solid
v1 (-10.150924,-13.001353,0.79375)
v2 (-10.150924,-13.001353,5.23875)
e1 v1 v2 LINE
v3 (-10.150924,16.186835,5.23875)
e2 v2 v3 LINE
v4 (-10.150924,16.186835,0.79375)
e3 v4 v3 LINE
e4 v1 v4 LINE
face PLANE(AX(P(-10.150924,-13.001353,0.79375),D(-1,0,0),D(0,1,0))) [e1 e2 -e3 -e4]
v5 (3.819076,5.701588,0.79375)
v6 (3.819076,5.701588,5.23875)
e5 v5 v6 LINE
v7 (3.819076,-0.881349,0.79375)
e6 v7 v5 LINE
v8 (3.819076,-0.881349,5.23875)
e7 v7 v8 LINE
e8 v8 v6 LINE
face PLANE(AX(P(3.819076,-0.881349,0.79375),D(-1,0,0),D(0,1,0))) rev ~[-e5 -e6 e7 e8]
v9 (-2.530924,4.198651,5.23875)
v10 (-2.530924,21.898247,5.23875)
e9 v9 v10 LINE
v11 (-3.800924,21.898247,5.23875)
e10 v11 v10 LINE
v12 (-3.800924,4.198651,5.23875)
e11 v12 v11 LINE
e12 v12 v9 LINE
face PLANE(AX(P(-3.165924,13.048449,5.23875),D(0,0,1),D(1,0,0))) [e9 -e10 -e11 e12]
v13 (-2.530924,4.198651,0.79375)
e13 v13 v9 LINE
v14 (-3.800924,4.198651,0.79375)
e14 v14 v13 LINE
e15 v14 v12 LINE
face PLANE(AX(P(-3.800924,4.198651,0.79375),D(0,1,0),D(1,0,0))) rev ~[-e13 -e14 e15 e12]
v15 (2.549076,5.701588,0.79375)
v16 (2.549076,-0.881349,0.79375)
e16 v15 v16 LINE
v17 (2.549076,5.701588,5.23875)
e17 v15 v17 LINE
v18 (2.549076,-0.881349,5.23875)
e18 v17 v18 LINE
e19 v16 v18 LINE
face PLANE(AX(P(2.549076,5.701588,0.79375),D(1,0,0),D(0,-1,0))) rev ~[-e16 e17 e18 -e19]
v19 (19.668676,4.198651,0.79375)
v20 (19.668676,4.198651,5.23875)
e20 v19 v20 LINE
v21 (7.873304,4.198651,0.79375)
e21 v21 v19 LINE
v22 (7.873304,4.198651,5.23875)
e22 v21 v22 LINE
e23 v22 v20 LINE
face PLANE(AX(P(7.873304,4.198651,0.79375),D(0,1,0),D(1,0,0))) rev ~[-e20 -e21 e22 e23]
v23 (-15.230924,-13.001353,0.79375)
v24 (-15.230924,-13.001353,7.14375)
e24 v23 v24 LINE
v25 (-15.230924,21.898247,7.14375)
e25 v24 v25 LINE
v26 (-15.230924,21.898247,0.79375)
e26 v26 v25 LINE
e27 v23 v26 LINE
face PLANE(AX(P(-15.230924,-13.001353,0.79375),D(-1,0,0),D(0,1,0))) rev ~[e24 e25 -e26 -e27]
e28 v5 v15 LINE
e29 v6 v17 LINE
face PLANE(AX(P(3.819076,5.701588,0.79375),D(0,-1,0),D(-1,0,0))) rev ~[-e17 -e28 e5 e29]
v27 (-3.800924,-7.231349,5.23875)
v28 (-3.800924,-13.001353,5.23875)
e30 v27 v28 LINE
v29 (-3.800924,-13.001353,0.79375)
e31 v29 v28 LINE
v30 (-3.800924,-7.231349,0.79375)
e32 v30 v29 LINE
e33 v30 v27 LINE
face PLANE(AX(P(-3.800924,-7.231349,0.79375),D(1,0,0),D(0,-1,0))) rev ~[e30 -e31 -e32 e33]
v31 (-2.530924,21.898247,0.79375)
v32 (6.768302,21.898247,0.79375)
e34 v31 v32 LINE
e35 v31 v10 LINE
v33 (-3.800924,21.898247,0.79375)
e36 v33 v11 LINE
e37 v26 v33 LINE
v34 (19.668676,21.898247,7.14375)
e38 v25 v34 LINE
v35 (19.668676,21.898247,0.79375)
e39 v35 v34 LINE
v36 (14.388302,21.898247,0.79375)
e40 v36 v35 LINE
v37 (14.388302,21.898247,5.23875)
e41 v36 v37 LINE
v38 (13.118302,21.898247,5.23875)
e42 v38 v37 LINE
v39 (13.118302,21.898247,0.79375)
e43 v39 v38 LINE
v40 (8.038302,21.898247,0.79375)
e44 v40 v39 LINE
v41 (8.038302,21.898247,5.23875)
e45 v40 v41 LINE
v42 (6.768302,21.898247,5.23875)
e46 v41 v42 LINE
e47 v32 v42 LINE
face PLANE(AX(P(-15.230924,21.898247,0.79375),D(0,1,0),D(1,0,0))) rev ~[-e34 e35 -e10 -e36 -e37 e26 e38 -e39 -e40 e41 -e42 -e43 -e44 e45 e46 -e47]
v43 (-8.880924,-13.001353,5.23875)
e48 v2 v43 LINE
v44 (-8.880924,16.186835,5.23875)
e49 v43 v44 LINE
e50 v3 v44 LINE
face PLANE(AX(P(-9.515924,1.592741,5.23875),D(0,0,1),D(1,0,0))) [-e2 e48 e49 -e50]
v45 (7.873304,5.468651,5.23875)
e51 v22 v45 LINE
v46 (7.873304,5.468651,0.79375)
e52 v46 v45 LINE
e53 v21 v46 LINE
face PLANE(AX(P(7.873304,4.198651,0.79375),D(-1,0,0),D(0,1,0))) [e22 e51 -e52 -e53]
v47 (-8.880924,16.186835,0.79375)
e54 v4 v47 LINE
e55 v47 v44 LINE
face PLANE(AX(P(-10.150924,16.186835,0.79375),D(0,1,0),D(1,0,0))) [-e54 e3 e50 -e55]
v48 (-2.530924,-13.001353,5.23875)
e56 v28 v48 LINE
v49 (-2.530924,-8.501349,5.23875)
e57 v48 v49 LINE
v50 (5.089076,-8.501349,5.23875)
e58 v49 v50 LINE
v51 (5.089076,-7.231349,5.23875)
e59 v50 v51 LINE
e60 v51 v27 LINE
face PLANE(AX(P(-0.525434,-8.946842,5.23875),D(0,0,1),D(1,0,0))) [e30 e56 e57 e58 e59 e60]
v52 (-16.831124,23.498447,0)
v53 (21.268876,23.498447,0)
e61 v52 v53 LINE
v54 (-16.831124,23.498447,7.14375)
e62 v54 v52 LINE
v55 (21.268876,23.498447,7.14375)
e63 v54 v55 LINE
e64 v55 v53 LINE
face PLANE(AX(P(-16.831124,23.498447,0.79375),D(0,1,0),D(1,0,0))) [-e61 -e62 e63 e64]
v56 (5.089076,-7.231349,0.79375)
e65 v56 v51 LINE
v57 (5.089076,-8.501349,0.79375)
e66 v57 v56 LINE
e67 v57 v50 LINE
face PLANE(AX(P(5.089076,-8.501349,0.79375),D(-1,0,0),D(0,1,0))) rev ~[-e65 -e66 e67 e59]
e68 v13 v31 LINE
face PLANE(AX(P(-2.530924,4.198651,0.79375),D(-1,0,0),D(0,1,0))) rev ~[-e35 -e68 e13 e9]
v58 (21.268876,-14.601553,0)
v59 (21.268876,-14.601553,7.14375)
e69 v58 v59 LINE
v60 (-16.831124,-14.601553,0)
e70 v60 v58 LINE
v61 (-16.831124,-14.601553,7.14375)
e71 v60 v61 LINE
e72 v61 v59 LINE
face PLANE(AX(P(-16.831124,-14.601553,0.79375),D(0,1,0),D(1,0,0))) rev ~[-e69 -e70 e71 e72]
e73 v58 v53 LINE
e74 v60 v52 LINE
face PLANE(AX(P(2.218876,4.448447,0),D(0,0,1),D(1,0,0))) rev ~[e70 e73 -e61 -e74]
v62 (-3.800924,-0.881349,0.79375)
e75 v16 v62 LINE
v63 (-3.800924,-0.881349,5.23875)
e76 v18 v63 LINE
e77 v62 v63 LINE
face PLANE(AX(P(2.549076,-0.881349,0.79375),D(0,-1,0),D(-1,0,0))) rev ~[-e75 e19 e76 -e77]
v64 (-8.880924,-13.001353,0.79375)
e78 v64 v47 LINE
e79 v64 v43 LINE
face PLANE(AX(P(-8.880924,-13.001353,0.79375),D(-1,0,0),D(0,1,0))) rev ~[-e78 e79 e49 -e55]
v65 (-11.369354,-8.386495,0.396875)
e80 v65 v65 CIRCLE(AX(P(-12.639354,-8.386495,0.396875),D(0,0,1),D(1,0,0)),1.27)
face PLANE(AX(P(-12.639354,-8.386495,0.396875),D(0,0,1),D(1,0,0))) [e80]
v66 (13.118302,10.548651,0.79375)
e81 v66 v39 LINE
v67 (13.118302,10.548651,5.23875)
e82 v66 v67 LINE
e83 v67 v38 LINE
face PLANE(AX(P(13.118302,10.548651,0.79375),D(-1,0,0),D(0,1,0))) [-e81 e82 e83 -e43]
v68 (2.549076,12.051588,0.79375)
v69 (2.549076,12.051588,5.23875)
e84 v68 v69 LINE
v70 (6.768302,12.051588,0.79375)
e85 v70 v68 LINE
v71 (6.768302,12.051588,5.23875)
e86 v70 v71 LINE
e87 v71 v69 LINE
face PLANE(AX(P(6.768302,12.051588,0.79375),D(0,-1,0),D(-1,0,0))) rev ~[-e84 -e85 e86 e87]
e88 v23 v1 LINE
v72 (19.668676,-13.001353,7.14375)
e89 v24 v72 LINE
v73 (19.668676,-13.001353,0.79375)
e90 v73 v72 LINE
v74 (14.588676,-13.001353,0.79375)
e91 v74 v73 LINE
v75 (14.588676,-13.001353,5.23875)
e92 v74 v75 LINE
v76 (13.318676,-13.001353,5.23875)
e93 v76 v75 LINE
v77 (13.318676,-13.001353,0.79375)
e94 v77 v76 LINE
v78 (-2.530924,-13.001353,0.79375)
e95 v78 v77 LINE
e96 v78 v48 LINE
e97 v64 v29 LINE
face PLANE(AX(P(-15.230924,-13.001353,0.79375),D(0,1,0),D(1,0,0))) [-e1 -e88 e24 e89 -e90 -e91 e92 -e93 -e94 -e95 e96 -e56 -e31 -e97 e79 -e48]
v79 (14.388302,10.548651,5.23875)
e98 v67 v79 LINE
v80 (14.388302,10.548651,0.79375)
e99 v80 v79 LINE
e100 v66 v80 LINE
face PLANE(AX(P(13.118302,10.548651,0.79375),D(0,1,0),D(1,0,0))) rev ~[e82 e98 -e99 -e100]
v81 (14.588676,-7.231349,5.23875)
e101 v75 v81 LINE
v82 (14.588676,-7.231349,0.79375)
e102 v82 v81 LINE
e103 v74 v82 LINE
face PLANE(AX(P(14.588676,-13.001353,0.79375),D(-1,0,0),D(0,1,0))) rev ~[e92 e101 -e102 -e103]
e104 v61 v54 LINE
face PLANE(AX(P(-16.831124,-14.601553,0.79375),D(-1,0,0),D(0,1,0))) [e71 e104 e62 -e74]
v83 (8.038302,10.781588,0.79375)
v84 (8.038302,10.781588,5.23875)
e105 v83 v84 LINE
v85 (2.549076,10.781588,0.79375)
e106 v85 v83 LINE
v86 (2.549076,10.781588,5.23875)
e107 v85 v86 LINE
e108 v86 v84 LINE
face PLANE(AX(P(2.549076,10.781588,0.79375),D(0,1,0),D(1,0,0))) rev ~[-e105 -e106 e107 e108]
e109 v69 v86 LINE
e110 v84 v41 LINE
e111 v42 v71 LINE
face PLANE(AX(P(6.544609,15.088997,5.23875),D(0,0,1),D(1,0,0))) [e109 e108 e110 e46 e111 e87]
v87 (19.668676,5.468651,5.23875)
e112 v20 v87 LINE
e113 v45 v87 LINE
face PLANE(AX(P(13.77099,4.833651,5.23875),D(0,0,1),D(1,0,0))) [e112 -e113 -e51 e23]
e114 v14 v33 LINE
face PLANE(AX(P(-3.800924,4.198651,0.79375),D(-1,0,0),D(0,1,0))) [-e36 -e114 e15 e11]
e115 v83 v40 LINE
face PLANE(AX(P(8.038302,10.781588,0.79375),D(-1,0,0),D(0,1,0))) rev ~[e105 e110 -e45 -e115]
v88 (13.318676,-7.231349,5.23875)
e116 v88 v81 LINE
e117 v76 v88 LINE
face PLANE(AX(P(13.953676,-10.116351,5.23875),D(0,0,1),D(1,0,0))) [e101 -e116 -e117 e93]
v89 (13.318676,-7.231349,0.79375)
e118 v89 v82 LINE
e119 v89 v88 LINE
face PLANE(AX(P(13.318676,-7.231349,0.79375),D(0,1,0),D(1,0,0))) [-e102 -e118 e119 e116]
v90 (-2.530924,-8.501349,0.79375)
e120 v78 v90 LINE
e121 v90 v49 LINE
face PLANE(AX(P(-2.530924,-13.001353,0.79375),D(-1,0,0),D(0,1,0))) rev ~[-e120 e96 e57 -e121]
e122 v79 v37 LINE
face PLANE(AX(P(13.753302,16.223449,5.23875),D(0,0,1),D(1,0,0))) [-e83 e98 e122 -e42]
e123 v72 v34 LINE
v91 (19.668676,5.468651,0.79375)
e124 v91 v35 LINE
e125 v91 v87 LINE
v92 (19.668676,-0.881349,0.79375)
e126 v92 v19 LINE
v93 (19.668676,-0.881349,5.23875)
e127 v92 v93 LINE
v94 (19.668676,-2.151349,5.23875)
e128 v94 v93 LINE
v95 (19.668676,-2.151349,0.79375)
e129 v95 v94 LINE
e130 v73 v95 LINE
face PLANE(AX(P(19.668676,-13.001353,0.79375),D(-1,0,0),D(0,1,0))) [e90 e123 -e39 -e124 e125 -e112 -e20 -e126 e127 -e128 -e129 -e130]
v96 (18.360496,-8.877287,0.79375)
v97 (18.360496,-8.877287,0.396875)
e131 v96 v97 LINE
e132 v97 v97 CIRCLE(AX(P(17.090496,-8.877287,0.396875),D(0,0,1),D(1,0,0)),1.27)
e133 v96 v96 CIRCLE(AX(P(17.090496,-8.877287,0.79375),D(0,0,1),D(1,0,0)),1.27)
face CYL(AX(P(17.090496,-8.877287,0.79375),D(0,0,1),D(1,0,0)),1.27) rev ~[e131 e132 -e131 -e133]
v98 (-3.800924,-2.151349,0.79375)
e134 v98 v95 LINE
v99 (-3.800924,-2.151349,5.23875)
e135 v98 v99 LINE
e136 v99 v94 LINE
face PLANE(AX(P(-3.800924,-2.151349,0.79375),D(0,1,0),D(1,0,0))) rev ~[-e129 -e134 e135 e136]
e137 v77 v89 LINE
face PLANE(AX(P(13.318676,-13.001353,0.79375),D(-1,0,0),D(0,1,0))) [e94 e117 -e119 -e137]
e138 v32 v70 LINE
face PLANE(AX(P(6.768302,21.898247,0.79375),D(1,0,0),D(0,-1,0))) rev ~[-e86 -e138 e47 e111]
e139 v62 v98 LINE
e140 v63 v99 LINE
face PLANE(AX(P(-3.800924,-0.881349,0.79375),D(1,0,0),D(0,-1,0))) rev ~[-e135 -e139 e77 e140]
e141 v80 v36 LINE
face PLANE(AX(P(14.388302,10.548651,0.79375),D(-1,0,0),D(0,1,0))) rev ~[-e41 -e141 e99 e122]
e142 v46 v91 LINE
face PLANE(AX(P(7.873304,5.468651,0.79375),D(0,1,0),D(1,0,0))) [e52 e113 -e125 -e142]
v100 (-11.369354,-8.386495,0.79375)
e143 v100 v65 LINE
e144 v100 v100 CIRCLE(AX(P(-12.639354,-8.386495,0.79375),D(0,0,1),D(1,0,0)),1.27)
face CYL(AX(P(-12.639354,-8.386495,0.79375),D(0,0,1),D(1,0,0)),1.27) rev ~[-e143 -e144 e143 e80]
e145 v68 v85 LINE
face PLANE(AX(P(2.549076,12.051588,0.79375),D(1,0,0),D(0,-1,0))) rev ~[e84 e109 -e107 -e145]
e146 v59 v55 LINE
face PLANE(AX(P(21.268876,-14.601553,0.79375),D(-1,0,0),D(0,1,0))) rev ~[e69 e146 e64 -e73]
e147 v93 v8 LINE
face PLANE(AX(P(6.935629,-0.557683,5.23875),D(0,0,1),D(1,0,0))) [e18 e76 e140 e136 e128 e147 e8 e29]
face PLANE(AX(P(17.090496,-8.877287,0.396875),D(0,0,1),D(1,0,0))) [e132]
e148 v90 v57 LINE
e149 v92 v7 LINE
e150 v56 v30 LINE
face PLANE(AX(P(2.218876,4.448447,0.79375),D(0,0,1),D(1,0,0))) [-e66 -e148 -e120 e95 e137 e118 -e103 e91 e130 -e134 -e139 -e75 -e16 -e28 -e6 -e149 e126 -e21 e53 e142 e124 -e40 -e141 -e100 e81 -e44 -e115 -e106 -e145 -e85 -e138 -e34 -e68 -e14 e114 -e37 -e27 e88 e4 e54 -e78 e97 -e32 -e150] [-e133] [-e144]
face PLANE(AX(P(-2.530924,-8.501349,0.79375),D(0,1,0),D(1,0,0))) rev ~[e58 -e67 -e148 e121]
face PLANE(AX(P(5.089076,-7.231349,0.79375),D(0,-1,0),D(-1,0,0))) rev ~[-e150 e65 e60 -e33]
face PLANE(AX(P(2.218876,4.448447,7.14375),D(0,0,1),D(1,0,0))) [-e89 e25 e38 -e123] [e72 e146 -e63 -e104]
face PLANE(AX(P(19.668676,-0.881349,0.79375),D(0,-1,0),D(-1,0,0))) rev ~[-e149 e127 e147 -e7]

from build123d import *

# Parameters (mm, degrees)
F0_W     = 38.1
F0_H     = 38.1
F1_DEPTH = 0.79375
F2_W     = 38.1
F2_H     = 38.1
F2_W_2   = 34.8996
F2_H_2   = 34.8996
F3_DEPTH = 6.35
F4_W     = 1.27
F4_H     = 17.6995960579
F4_H_2   = 29.188188513
F4_W_2   = 11.795372231
F4_H_3   = 1.27
F4_H_4   = 11.3495960579
F4_H_5   = 5.7700039421
F6_DEPTH = 4.445
F5_R     = 1.27
F7_DEPTH = 0.396875


# Not quite as in the source:
# - a feature names something its author has since deleted; it is built from what else it names


with BuildPart() as f1:
    # F0 (on Top) → F1 (new body)
    with BuildSketch(Plane.XY):
        with Locations((2.218876034, 4.4484467313)):
            Rectangle(F0_W, F0_H)
    extrude(amount=F1_DEPTH)

    # F2 (on face) → F3 (join)
    with BuildSketch(Plane.XY.offset(0.79375)):
        with Locations((2.218876034, 4.4484467313)):
            Rectangle(F2_W, F2_H)
        with Locations((2.218876034, 4.4484467313)):
            Rectangle(F2_W_2, F2_H_2, mode=Mode.SUBTRACT)
    extrude(amount=F3_DEPTH)

    # F4 (on face) → F6 (join)
    with BuildSketch(Plane.XY.offset(0.79375)):
        with Locations((-3.165923966, 13.0484487024)):
            Rectangle(F4_W, F4_H)
        with Locations((-9.515923966, 1.5927409878)):
            Rectangle(F4_W, F4_H_2)
        Polygon((-3.800923966, -2.1513493266), (19.668676034, -2.1513493266), (19.668676034, -0.8813493266), (3.819076034, -0.8813493266), (3.819076034, 5.701588226), (2.549076034, 5.701588226), (2.549076034, -0.8813493266), (-3.800923966, -0.8813493266), align=None)
        Polygon((-3.800923966, -8.5013493266), (-3.800923966, -13.0013532687), (-2.530923966, -13.0013532687), (-2.530923966, -8.5013493266), (5.089076034, -8.5013493266), (5.089076034, -7.2313493266), (3.819076034, -7.2313493266), (-3.800923966, -7.2313493266), align=None)
        Polygon((8.0383015836, 21.8982467313), (6.7683015836, 21.8982467313), (6.7683015836, 12.051588226), (2.549076034, 12.051588226), (2.549076034, 10.781588226), (8.0383015836, 10.781588226), align=None)
        with Locations((13.7709899185, 4.8336506734)):
            Rectangle(F4_W_2, F4_H_3)
        with Locations((13.7533015836, 16.2234487024)):
            Rectangle(F4_W, F4_H_4)
        with Locations((13.953676034, -10.1163512976)):
            Rectangle(F4_W, F4_H_5)
    extrude(amount=F6_DEPTH)

    # F5 (on face) → F7 (cut)
    with BuildSketch(Plane.XY.offset(0.79375)):
        with Locations((17.0904958928, -8.8772866875)):
            Circle(F5_R)
        with Locations((-12.6393535174, -8.3864945918)):
            Circle(F5_R)
    extrude(amount=-F7_DEPTH, mode=Mode.SUBTRACT)


solid = f1.part
